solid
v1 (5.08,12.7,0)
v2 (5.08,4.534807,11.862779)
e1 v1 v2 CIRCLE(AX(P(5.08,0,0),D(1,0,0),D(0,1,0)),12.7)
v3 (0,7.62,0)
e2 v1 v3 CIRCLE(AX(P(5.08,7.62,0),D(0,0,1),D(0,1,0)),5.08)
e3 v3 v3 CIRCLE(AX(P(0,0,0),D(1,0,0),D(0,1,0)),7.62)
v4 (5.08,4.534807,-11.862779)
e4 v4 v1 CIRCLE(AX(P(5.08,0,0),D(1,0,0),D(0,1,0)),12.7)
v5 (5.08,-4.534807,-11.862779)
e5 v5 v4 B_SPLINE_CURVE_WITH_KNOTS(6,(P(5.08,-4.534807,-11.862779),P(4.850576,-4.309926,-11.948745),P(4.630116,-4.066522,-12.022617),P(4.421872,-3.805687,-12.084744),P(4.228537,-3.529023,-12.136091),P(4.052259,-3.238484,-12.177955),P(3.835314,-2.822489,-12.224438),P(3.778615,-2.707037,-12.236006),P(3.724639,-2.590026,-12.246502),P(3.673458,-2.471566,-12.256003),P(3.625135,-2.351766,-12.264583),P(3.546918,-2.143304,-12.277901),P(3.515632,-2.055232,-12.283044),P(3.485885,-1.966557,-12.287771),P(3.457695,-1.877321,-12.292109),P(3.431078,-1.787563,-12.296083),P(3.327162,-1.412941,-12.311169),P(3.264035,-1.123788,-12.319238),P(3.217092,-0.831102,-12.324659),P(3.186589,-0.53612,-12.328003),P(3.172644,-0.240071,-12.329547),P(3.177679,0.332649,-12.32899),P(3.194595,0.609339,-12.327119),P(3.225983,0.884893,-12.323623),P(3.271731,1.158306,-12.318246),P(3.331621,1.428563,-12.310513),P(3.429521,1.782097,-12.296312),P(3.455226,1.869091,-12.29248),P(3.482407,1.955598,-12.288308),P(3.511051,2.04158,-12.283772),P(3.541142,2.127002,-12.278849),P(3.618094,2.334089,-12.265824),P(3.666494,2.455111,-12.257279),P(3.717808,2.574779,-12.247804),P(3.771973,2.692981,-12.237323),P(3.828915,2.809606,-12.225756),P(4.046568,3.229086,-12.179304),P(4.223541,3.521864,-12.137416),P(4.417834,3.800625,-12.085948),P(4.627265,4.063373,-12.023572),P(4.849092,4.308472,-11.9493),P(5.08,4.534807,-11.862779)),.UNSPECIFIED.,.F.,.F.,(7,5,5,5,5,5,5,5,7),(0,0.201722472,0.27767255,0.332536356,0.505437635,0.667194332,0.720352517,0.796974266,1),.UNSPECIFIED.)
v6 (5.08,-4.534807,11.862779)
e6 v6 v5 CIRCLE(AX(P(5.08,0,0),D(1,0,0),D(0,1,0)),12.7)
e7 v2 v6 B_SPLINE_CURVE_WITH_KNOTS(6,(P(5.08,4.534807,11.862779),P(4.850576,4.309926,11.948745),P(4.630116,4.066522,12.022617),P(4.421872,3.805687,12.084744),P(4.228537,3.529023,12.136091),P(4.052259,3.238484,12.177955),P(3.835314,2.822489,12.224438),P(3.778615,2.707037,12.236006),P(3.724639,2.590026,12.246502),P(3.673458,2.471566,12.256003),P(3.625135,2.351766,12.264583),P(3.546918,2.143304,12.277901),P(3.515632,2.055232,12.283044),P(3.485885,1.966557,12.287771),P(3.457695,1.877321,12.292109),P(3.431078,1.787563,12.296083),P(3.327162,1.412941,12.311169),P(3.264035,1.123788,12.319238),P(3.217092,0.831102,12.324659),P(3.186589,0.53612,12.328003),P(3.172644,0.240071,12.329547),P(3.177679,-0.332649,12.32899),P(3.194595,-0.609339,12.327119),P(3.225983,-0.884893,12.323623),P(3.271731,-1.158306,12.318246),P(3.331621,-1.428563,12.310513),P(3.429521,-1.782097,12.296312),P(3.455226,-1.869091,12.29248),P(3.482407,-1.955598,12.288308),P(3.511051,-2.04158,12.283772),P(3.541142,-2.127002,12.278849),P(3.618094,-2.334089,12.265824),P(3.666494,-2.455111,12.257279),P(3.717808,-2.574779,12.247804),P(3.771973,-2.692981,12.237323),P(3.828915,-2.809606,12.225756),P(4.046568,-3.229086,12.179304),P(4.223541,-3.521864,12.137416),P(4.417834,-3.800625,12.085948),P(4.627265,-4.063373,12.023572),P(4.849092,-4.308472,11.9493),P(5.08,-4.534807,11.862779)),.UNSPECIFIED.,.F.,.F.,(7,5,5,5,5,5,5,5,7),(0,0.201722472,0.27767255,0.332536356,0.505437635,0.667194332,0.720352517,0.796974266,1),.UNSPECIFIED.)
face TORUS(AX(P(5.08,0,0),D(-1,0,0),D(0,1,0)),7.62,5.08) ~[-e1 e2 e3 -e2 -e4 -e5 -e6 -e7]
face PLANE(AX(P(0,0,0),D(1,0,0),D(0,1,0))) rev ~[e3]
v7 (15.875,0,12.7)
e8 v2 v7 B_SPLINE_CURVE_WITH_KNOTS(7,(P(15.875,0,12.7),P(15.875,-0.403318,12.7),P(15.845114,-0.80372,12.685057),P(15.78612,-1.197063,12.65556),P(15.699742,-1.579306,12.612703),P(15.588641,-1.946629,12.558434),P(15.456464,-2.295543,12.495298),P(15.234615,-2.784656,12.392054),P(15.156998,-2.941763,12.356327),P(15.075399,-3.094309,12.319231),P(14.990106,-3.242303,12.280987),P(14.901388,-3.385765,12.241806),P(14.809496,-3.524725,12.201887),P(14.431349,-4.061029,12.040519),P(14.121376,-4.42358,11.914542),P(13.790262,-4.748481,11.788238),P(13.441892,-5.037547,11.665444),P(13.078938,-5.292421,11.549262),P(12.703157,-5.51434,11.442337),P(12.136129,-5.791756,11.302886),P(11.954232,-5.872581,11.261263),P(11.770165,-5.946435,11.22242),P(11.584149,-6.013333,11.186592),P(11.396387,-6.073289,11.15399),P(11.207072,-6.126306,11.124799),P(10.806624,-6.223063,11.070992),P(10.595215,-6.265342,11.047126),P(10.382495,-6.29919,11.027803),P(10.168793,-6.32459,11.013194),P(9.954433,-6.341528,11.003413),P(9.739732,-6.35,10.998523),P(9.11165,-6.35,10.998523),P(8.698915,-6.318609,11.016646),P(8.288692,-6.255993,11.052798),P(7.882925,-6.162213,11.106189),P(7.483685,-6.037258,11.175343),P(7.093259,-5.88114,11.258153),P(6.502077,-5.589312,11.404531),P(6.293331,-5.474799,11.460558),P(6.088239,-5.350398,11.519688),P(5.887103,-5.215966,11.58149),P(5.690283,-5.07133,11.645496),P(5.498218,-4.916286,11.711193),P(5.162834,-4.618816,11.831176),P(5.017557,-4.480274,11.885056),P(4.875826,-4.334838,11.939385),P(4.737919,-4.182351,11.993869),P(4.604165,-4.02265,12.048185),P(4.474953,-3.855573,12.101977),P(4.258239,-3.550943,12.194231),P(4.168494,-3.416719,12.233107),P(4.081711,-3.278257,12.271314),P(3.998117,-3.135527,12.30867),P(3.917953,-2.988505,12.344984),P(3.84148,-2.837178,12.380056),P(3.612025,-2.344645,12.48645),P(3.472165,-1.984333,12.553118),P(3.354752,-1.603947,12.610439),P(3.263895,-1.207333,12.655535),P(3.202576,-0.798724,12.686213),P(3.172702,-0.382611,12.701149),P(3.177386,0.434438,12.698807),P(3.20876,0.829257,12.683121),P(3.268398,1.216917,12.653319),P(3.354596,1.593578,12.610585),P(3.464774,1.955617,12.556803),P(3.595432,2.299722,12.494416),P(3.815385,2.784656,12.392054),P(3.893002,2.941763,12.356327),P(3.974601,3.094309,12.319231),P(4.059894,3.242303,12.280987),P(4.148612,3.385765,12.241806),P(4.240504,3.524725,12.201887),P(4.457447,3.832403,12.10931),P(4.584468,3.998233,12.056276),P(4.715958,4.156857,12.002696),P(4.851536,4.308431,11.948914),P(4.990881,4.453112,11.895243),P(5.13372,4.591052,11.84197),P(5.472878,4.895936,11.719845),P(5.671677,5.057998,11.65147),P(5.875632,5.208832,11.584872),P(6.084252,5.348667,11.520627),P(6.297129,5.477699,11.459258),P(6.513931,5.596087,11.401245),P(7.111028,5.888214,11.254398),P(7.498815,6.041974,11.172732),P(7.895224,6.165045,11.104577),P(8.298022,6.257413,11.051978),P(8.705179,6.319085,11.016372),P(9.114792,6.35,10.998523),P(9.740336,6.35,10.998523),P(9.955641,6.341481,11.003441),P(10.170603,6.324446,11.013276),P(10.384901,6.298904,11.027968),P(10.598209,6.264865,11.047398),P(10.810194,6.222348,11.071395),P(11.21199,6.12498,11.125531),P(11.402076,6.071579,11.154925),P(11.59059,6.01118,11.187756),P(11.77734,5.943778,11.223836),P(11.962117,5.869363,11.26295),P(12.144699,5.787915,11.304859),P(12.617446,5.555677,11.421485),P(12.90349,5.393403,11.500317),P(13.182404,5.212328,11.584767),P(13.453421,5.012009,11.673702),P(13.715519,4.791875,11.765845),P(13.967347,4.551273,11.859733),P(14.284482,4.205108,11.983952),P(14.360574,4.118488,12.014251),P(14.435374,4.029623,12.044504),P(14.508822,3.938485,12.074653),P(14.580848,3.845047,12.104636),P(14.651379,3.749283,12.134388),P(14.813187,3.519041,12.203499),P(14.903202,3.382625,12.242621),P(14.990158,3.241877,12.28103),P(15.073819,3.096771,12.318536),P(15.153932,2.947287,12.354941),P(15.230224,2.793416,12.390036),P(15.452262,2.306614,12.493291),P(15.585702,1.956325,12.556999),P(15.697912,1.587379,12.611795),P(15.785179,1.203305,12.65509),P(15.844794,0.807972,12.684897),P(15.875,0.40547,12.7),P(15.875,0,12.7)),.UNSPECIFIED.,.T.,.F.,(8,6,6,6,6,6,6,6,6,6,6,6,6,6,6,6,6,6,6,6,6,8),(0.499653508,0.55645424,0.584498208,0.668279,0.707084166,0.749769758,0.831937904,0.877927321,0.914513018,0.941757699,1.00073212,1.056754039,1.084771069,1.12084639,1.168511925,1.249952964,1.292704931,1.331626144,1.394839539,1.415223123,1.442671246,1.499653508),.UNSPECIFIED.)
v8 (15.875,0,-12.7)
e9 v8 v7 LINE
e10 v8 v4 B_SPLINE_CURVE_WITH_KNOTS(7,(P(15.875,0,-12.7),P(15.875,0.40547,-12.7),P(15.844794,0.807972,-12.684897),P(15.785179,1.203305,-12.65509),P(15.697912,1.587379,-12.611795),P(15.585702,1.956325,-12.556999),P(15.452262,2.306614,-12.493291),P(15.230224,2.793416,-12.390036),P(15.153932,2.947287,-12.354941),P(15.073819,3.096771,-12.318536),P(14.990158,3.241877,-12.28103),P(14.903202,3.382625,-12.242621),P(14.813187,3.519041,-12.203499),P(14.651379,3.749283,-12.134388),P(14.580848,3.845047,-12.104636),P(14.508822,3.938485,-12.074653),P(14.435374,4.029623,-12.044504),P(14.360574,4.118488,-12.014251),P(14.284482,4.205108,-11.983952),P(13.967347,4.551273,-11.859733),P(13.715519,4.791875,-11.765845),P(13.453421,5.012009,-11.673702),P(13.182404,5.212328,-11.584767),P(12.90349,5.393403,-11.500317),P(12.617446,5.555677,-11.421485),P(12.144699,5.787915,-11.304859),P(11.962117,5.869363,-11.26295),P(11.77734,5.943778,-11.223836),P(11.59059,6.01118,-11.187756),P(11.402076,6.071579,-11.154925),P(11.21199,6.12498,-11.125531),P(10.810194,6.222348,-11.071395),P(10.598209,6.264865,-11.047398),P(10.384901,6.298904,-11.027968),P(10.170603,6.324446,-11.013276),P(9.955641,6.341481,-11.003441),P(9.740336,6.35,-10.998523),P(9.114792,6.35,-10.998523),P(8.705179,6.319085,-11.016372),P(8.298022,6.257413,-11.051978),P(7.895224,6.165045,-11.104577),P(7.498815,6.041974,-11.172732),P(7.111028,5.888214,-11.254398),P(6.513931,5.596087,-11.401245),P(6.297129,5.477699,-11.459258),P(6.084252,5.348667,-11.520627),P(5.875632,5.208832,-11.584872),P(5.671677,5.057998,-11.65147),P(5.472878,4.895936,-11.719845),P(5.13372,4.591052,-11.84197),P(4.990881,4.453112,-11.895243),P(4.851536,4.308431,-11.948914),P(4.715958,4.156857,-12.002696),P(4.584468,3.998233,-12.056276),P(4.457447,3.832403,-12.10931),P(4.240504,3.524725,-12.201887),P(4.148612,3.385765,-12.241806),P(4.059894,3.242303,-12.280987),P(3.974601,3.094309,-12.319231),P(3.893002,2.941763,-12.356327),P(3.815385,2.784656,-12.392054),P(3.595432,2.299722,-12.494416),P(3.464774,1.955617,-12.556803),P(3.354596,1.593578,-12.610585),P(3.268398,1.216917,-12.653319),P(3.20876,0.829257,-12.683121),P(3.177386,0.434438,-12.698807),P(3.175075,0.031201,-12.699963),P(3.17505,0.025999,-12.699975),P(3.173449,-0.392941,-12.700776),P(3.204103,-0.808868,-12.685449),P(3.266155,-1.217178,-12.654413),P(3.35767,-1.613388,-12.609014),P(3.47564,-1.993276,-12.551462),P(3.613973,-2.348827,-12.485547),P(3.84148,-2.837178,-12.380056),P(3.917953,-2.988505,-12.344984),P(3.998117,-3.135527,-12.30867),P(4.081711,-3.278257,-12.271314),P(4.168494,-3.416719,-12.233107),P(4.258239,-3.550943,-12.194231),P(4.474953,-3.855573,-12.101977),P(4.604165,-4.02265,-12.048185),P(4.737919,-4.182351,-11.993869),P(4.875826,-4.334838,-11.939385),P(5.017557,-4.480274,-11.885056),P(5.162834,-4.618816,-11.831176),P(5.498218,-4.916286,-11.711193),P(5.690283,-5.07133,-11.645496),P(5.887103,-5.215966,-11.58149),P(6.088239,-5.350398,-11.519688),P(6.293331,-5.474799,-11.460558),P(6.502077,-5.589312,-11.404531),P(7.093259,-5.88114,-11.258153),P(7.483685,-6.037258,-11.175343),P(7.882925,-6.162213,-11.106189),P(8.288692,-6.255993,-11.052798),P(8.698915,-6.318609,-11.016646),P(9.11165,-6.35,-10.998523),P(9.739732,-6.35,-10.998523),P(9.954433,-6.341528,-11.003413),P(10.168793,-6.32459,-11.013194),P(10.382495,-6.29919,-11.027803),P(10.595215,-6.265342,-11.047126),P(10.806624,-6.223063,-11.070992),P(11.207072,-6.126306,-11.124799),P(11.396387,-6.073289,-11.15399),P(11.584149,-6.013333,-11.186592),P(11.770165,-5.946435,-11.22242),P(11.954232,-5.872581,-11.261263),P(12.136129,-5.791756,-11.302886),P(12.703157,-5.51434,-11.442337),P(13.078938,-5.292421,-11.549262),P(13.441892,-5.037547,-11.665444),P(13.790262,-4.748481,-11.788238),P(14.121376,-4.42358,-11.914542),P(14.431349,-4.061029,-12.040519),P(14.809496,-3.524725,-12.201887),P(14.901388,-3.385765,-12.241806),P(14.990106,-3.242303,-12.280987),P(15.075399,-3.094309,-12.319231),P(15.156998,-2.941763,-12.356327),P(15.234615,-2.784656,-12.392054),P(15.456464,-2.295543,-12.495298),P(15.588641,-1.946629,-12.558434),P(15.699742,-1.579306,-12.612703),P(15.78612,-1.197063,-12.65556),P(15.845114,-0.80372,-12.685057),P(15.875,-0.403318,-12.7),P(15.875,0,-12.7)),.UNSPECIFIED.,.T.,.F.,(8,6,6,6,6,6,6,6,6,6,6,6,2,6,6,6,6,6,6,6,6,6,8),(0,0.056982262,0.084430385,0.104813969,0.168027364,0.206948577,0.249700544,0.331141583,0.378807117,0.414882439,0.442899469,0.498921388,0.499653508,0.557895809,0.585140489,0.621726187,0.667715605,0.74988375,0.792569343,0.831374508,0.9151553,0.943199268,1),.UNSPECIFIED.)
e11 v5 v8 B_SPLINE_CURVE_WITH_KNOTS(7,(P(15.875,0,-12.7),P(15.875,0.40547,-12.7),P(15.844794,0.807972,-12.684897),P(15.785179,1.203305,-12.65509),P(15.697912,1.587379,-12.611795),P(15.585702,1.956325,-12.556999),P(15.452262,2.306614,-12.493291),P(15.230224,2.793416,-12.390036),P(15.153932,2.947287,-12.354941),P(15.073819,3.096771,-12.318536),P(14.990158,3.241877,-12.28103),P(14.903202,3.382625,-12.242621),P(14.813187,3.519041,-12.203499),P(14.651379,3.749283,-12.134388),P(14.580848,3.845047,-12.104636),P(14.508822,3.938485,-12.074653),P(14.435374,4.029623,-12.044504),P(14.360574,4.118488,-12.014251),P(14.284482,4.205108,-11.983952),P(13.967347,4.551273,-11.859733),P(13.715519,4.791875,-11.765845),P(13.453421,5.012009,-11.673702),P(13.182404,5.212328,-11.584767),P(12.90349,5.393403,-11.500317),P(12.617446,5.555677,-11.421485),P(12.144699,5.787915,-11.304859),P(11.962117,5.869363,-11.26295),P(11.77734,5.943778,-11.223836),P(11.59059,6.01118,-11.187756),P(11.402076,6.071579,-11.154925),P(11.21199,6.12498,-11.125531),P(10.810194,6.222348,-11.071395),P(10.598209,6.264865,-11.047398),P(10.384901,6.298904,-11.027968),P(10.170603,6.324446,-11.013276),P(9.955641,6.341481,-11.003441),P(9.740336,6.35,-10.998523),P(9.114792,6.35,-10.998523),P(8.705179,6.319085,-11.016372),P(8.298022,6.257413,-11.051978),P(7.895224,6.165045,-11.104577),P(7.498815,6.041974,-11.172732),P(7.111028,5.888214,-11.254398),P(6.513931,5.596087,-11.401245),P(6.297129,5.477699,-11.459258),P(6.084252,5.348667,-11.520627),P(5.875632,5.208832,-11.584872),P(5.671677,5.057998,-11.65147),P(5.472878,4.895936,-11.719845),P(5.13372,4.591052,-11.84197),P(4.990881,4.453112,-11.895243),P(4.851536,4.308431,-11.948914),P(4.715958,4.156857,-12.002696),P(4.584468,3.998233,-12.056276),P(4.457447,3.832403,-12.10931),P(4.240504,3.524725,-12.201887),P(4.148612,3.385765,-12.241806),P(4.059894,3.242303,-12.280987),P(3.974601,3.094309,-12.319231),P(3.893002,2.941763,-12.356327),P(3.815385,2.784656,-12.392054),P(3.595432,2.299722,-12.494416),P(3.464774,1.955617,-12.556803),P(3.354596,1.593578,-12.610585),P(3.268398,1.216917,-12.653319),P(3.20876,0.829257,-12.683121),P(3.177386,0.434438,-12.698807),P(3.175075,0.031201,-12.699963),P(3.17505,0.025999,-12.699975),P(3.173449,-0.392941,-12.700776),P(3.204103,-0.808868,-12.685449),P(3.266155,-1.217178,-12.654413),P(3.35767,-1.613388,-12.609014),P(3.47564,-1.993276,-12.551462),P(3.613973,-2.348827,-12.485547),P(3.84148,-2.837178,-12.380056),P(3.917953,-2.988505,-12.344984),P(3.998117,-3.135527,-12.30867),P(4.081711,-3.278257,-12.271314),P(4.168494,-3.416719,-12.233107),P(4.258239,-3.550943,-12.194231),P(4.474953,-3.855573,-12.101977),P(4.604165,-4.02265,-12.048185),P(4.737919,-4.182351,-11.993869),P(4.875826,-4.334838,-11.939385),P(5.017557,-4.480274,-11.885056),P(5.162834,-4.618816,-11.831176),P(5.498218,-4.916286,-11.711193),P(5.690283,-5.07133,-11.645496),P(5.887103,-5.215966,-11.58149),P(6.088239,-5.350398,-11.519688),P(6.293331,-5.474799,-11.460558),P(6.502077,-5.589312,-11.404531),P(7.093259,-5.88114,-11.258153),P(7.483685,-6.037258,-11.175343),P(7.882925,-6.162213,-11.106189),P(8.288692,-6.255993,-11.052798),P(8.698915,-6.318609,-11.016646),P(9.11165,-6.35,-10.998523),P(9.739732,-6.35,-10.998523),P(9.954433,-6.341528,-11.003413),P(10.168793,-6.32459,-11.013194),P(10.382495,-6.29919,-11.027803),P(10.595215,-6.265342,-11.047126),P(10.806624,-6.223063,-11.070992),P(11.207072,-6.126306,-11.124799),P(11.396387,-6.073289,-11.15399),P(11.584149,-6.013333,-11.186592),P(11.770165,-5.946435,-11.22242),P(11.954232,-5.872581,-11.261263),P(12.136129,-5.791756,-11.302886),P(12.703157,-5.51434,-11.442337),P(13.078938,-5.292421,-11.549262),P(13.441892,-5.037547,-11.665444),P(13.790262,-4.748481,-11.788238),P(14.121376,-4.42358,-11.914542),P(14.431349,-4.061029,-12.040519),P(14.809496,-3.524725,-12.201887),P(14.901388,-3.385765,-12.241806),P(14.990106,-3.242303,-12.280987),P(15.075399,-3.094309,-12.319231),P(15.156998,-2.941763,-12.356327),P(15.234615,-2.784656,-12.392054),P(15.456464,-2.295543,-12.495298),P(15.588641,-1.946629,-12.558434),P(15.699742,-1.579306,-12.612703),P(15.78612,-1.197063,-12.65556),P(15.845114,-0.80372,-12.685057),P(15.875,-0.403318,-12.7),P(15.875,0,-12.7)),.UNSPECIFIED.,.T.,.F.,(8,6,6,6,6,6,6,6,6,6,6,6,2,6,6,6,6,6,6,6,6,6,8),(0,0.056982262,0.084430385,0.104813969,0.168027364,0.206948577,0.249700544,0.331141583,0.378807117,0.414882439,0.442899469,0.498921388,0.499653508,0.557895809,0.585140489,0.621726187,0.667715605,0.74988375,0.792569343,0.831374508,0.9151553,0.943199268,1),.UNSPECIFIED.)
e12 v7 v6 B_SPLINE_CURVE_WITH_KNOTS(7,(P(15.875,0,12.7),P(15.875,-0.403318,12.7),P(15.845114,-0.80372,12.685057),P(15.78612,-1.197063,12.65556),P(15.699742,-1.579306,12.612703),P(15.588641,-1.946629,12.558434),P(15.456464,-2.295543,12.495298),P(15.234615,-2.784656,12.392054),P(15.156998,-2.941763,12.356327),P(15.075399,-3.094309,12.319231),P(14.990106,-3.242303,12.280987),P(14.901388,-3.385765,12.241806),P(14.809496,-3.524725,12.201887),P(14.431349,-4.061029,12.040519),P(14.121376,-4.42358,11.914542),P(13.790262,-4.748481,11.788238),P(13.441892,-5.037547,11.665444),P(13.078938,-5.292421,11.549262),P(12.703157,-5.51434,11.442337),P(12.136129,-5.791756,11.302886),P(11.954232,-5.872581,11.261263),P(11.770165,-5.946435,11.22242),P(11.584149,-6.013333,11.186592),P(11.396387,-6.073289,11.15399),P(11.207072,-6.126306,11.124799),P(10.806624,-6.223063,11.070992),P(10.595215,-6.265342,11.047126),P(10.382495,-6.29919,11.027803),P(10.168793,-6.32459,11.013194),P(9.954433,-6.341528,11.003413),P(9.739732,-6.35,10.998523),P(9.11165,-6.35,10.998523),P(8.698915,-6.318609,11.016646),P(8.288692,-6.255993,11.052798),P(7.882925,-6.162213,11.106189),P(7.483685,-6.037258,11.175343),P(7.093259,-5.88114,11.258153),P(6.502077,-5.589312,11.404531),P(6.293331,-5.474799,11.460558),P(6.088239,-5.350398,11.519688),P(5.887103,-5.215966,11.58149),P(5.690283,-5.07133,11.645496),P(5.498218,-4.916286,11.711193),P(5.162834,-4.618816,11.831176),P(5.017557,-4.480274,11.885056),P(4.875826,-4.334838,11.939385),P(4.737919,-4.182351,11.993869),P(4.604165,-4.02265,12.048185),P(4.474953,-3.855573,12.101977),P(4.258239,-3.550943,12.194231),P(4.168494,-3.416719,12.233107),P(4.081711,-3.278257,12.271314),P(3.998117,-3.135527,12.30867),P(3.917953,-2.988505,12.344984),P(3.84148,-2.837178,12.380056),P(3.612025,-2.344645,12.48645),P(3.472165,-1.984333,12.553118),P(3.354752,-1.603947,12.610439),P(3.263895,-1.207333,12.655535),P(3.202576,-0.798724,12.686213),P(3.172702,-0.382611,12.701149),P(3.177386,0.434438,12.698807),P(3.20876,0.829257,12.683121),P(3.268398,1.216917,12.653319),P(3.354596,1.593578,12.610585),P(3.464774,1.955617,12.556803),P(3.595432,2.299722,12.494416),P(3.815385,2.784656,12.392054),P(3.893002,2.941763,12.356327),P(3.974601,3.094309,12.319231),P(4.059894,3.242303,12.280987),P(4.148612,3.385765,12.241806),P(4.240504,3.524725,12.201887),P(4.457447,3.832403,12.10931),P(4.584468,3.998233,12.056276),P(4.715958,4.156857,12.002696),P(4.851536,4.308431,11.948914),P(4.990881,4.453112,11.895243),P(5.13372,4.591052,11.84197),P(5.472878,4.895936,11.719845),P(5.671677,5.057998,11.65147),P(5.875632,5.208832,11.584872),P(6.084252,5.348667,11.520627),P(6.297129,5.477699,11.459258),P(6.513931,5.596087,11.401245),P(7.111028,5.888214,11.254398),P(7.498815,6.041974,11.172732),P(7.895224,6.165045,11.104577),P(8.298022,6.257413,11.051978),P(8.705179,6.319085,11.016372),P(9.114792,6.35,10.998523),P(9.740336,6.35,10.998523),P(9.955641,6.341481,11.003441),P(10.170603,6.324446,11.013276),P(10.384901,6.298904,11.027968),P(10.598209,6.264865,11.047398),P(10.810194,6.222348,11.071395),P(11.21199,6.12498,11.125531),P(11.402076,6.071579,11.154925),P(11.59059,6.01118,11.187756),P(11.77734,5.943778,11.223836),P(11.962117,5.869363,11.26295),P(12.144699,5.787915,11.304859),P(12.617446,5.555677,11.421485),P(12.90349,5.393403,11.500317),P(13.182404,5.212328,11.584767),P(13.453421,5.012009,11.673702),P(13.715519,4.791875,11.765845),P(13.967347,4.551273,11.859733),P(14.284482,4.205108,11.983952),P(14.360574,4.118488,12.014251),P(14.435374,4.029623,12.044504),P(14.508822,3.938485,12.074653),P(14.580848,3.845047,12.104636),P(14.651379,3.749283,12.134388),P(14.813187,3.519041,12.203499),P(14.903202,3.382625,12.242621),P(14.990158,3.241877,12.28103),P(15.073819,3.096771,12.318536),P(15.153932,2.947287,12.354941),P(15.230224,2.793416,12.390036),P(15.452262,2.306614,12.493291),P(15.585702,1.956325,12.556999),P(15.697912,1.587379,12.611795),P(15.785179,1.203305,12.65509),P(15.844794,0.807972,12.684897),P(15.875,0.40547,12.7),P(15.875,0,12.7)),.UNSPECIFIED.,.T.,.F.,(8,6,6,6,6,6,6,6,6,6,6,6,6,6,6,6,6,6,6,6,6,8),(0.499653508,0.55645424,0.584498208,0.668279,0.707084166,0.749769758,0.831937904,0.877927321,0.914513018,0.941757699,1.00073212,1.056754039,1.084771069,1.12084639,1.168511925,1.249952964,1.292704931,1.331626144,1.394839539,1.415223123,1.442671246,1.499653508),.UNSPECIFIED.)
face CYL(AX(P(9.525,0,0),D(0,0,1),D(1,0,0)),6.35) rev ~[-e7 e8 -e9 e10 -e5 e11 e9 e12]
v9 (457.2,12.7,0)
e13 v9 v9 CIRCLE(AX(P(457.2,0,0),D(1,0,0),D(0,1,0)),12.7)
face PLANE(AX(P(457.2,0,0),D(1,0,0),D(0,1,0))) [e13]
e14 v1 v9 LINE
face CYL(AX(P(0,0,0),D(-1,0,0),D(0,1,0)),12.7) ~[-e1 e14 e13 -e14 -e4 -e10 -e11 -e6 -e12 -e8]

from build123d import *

# Parameters (mm, degrees)
F0_R     = 12.7
F1_DEPTH = 457.2
F2_R     = 6.35
F3_DEPTH = 12.7


# Not quite as in the source:
# - a fillet or chamfer that OpenCascade refuses, or shapes differently, is made with other operations: its cross-section is extruded or revolved along the edge and cut away or added


with BuildPart() as f1:
    # F0 (on Right) → F1 (new body)
    with BuildSketch(Plane.YZ):
        Circle(F0_R)
    extrude(amount=F1_DEPTH)

    # F2 (on Top) → F3 (cut, symmetric)
    with BuildSketch(Plane.XY):
        with Locations((9.525, 0)):
            Circle(F2_R)
    extrude(amount=F3_DEPTH, both=True, mode=Mode.SUBTRACT)

    # F4: fillet of radius 5.08 on 1 edges, made by hand

    # F4_s1 → F4_t2 (revolve, cut)
    with BuildSketch(Plane.XY):
        with BuildLine():
            ThreePointArc((5.08, 12.7), (1.4878975516, 11.2121024484), (0, 7.62))
            Line((0, 7.62), (0, 12.7))
            Line((0, 12.7), (5.08, 12.7))
        make_face()
    revolve(axis=Axis((0, 0, 0), (1, 0, 0)), mode=Mode.SUBTRACT)


solid = f1.part
